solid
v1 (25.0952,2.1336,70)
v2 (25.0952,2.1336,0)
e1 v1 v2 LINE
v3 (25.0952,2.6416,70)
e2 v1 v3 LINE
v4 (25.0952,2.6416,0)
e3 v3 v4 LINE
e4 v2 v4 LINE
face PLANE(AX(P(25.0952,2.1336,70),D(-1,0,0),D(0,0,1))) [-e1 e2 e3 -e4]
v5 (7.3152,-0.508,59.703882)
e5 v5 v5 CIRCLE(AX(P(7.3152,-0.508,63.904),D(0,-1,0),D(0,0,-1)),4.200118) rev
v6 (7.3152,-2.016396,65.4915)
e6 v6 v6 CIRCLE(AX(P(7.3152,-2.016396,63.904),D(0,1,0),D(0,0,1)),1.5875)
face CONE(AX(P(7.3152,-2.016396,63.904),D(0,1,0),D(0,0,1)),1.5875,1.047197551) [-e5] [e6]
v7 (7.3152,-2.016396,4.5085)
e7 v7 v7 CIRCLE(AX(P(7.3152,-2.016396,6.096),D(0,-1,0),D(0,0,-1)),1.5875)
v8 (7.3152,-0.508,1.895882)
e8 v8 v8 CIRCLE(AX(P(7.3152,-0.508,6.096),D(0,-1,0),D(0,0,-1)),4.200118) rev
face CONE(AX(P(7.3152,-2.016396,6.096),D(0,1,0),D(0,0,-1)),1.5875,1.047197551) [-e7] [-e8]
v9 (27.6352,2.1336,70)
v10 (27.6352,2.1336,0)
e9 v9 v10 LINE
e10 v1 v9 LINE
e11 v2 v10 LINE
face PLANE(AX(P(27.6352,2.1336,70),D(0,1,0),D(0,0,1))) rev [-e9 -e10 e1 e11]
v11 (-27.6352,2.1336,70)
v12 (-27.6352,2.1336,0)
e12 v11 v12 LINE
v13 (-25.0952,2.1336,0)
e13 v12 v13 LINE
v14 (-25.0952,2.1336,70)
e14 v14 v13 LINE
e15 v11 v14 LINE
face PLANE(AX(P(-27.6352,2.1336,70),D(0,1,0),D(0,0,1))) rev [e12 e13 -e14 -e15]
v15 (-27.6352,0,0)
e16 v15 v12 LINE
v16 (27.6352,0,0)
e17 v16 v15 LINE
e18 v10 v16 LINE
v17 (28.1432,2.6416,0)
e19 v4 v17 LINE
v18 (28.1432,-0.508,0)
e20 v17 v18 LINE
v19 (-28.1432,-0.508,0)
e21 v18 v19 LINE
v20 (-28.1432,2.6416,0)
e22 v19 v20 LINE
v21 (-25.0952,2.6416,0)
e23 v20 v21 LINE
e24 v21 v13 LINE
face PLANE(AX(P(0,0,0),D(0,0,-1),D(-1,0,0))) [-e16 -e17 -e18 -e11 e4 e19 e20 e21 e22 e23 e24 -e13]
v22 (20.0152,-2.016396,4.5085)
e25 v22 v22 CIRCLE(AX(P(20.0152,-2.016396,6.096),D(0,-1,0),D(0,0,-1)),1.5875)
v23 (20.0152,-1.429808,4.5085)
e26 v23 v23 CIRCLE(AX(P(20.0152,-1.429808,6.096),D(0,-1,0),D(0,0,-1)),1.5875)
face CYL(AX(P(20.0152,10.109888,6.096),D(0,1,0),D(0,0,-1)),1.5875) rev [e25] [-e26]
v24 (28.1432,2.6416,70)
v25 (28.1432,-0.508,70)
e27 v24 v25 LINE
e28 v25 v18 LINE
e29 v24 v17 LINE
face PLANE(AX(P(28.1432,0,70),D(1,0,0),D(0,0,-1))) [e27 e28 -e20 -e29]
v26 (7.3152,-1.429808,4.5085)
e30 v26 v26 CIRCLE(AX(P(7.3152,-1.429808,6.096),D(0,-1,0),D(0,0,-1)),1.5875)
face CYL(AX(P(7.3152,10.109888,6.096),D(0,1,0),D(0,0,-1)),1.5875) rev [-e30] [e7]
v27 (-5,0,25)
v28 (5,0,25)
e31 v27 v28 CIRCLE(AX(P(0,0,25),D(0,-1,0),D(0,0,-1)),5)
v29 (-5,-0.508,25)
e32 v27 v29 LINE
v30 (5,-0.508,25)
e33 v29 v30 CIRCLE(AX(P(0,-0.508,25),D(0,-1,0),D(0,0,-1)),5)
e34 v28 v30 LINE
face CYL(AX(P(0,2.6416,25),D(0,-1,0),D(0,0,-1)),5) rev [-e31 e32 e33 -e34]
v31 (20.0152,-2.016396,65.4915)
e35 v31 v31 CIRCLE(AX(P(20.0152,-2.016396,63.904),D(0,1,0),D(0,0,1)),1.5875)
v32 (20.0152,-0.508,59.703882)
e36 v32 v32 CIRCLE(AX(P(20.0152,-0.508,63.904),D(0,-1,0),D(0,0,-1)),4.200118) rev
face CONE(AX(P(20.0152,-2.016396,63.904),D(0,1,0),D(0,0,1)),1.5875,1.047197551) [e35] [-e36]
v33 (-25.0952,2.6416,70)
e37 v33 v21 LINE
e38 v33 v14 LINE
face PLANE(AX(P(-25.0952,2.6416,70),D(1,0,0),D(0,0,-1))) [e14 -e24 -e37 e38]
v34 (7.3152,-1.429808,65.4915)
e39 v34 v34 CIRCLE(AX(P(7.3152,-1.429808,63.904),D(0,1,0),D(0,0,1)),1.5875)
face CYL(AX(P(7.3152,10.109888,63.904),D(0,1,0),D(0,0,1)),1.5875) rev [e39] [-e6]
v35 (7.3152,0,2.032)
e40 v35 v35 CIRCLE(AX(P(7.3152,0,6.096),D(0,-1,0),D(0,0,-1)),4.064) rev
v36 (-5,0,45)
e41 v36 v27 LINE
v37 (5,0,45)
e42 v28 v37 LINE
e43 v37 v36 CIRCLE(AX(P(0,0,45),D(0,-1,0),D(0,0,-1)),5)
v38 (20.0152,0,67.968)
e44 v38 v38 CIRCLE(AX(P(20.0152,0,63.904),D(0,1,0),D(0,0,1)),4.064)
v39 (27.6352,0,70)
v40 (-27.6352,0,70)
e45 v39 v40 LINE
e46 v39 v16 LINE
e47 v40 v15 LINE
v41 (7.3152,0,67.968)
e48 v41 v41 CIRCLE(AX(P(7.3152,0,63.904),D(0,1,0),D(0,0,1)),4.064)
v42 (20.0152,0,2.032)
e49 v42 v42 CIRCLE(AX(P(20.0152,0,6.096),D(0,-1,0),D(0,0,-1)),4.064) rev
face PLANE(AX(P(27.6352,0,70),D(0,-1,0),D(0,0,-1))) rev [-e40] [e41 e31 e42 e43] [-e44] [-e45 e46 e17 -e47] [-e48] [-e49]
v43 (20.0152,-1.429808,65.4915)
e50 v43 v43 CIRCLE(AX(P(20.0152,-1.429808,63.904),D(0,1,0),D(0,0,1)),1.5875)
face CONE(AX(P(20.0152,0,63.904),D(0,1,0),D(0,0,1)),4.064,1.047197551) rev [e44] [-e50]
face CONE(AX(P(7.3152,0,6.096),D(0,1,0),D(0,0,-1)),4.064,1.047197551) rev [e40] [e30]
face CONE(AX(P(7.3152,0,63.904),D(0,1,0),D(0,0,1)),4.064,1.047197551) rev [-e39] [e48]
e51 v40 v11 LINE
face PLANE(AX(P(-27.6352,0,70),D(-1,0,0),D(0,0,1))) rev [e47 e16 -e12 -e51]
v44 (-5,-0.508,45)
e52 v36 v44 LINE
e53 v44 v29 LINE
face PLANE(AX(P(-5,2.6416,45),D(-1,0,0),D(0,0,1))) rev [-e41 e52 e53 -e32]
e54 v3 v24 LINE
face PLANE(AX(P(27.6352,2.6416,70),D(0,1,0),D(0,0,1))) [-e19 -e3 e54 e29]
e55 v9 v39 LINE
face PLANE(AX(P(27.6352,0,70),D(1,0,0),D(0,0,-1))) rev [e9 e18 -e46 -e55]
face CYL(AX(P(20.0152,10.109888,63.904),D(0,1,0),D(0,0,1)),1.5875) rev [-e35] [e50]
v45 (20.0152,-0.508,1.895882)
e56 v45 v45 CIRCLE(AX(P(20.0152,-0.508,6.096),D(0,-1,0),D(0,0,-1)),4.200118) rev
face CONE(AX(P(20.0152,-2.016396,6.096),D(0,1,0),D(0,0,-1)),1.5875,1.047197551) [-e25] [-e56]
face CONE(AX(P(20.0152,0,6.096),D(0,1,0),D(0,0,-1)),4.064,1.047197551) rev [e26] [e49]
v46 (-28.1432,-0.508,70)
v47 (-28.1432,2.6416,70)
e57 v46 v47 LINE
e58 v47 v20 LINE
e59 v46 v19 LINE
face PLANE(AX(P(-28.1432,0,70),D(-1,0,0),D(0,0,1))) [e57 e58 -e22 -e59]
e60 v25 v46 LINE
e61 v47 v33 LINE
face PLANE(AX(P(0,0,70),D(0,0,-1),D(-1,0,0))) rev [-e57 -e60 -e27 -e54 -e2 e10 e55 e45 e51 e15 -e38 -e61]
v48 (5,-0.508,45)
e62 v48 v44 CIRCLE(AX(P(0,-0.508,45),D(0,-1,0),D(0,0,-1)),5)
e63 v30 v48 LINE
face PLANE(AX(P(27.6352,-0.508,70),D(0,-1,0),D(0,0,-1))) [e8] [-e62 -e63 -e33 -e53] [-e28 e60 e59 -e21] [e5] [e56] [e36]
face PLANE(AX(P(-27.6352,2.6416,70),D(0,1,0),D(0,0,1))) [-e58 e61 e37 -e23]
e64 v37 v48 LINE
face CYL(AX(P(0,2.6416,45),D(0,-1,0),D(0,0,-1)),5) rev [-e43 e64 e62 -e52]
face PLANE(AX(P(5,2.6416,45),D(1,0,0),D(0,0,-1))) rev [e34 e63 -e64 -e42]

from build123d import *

# Parameters (mm, degrees)
EXTRUDE_THIN3_DEPTH     = 70
CUT_EXTRUDE1_DEPTH      = 76.511321578
CUT_EXTRUDE1_DEPTH_BACK = 76.511321578
SKETCH9_R               = 4.064
CUT_EXTRUDE2_DEPTH      = 2.54
LPATTERN1_COUNT         = 2
LPATTERN1_PITCH         = 12.7


# Read off the part's stored shape, not the designer's step: Mirror1
with BuildPart() as part:
    # Sketch6 → Extrude-Thin3 (new body)
    with BuildSketch(Plane.XY):
        Polygon((25.0952, 2.1336), (27.6352, 2.1336), (27.6352, 0), (-27.6352, 0), (-27.6352, 2.1336), (-25.0952, 2.1336), (-25.0952, 2.6416), (-28.1432, 2.6416), (-28.1432, -0.508), (28.1432, -0.508), (28.1432, 2.6416), (25.0952, 2.6416), align=None)
    extrude(amount=EXTRUDE_THIN3_DEPTH)

    # Sketch8 → Cut-Extrude1 (cut, two sides: drawn at the far end of the back side and taken through both)
    with BuildSketch(Plane.XZ.offset(0.508).offset(-CUT_EXTRUDE1_DEPTH_BACK)):
        with BuildLine():
            Line((5, 45), (5, 25))
            ThreePointArc((5, 25), (0, 20), (-5, 25))
            Line((-5, 25), (-5, 45))
            ThreePointArc((-5, 45), (0, 50), (5, 45))
        make_face()
    extrude(amount=CUT_EXTRUDE1_DEPTH + CUT_EXTRUDE1_DEPTH_BACK, mode=Mode.SUBTRACT)

    # Sketch9 → Cut-Extrude2 (cut)
    with BuildSketch(Plane.XZ.offset(0.508)):
        with Locations(Location((20.0152, 63.904, 0), (0, 0, 270))):
            Circle(SKETCH9_R)
    cut_extrude2 = extrude(amount=-CUT_EXTRUDE2_DEPTH, mode=Mode.SUBTRACT)

    # Sketch10 → Revolve1 (revolve)
    with BuildSketch(Plane(origin=(0, 0, 63.904), x_dir=(0, -1, 0), z_dir=(0, 0, 1)), mode=Mode.PRIVATE) as revolve1_sk:
        Polygon((0, 24.0792), (1.429807942, 21.6027), (2.016395815, 21.6027), (0, 25.0952), align=None)
    revolve1 = revolve(revolve1_sk.sketch.rotate(Axis((20.0152, 10.109887768, 63.904), (0, -1, 0)), 90), axis=Axis((20.0152, 10.109887768, 63.904), (0, -1, 0)))

    # LPattern1: Cut-Extrude2, Revolve1 ×2
    with Locations(*[(-i * LPATTERN1_PITCH, 0, 0) for i in range(1, LPATTERN1_COUNT)]):
        add(cut_extrude2, mode=Mode.SUBTRACT)
        add(revolve1)

    # Mirror1 outline → Mirror1 (revolve)
    with BuildSketch(Plane(origin=(20.0152, 0, 6.096), x_dir=(1, 0, 0), z_dir=(0, 0, 1))):
        Polygon((3.18411819, -0.508), (1.5875, -1.429807942), (1.5875, -2.016395815), (4.20011819, -0.508), align=None)
    revolve(axis=Axis((20.0152, 0, 6.096), (0, 1, 0)))

    # Mirror1 2 outline → Mirror1 2 (revolve)
    with BuildSketch(Plane(origin=(7.3152, 0, 6.096), x_dir=(1, 0, 0), z_dir=(0, 0, 1))):
        Polygon((3.18411819, -0.508), (1.5875, -1.429807942), (1.5875, -2.016395815), (4.20011819, -0.508), align=None)
    revolve(axis=Axis((7.3152, 0, 6.096), (0, 1, 0)))

    # Mirror1 3 outline → Mirror1 3 (revolve, cut)
    with BuildSketch(Plane(origin=(20.0152, 0, 6.096), x_dir=(1, 0, 0), z_dir=(0, 0, 1))):
        Polygon((3.18411819, -0.508), (4.064, 0), (0, 0), (0, -0.508), align=None)
    revolve(axis=Axis((20.0152, 0, 6.096), (0, 1, 0)), mode=Mode.SUBTRACT)

    # Mirror1 4 outline → Mirror1 4 (revolve, cut)
    with BuildSketch(Plane(origin=(7.3152, 0, 6.096), x_dir=(1, 0, 0), z_dir=(0, 0, 1))):
        Polygon((3.18411819, -0.508), (4.064, 0), (0, 0), (0, -0.508), align=None)
    revolve(axis=Axis((7.3152, 0, 6.096), (0, 1, 0)), mode=Mode.SUBTRACT)


solid = part.part
